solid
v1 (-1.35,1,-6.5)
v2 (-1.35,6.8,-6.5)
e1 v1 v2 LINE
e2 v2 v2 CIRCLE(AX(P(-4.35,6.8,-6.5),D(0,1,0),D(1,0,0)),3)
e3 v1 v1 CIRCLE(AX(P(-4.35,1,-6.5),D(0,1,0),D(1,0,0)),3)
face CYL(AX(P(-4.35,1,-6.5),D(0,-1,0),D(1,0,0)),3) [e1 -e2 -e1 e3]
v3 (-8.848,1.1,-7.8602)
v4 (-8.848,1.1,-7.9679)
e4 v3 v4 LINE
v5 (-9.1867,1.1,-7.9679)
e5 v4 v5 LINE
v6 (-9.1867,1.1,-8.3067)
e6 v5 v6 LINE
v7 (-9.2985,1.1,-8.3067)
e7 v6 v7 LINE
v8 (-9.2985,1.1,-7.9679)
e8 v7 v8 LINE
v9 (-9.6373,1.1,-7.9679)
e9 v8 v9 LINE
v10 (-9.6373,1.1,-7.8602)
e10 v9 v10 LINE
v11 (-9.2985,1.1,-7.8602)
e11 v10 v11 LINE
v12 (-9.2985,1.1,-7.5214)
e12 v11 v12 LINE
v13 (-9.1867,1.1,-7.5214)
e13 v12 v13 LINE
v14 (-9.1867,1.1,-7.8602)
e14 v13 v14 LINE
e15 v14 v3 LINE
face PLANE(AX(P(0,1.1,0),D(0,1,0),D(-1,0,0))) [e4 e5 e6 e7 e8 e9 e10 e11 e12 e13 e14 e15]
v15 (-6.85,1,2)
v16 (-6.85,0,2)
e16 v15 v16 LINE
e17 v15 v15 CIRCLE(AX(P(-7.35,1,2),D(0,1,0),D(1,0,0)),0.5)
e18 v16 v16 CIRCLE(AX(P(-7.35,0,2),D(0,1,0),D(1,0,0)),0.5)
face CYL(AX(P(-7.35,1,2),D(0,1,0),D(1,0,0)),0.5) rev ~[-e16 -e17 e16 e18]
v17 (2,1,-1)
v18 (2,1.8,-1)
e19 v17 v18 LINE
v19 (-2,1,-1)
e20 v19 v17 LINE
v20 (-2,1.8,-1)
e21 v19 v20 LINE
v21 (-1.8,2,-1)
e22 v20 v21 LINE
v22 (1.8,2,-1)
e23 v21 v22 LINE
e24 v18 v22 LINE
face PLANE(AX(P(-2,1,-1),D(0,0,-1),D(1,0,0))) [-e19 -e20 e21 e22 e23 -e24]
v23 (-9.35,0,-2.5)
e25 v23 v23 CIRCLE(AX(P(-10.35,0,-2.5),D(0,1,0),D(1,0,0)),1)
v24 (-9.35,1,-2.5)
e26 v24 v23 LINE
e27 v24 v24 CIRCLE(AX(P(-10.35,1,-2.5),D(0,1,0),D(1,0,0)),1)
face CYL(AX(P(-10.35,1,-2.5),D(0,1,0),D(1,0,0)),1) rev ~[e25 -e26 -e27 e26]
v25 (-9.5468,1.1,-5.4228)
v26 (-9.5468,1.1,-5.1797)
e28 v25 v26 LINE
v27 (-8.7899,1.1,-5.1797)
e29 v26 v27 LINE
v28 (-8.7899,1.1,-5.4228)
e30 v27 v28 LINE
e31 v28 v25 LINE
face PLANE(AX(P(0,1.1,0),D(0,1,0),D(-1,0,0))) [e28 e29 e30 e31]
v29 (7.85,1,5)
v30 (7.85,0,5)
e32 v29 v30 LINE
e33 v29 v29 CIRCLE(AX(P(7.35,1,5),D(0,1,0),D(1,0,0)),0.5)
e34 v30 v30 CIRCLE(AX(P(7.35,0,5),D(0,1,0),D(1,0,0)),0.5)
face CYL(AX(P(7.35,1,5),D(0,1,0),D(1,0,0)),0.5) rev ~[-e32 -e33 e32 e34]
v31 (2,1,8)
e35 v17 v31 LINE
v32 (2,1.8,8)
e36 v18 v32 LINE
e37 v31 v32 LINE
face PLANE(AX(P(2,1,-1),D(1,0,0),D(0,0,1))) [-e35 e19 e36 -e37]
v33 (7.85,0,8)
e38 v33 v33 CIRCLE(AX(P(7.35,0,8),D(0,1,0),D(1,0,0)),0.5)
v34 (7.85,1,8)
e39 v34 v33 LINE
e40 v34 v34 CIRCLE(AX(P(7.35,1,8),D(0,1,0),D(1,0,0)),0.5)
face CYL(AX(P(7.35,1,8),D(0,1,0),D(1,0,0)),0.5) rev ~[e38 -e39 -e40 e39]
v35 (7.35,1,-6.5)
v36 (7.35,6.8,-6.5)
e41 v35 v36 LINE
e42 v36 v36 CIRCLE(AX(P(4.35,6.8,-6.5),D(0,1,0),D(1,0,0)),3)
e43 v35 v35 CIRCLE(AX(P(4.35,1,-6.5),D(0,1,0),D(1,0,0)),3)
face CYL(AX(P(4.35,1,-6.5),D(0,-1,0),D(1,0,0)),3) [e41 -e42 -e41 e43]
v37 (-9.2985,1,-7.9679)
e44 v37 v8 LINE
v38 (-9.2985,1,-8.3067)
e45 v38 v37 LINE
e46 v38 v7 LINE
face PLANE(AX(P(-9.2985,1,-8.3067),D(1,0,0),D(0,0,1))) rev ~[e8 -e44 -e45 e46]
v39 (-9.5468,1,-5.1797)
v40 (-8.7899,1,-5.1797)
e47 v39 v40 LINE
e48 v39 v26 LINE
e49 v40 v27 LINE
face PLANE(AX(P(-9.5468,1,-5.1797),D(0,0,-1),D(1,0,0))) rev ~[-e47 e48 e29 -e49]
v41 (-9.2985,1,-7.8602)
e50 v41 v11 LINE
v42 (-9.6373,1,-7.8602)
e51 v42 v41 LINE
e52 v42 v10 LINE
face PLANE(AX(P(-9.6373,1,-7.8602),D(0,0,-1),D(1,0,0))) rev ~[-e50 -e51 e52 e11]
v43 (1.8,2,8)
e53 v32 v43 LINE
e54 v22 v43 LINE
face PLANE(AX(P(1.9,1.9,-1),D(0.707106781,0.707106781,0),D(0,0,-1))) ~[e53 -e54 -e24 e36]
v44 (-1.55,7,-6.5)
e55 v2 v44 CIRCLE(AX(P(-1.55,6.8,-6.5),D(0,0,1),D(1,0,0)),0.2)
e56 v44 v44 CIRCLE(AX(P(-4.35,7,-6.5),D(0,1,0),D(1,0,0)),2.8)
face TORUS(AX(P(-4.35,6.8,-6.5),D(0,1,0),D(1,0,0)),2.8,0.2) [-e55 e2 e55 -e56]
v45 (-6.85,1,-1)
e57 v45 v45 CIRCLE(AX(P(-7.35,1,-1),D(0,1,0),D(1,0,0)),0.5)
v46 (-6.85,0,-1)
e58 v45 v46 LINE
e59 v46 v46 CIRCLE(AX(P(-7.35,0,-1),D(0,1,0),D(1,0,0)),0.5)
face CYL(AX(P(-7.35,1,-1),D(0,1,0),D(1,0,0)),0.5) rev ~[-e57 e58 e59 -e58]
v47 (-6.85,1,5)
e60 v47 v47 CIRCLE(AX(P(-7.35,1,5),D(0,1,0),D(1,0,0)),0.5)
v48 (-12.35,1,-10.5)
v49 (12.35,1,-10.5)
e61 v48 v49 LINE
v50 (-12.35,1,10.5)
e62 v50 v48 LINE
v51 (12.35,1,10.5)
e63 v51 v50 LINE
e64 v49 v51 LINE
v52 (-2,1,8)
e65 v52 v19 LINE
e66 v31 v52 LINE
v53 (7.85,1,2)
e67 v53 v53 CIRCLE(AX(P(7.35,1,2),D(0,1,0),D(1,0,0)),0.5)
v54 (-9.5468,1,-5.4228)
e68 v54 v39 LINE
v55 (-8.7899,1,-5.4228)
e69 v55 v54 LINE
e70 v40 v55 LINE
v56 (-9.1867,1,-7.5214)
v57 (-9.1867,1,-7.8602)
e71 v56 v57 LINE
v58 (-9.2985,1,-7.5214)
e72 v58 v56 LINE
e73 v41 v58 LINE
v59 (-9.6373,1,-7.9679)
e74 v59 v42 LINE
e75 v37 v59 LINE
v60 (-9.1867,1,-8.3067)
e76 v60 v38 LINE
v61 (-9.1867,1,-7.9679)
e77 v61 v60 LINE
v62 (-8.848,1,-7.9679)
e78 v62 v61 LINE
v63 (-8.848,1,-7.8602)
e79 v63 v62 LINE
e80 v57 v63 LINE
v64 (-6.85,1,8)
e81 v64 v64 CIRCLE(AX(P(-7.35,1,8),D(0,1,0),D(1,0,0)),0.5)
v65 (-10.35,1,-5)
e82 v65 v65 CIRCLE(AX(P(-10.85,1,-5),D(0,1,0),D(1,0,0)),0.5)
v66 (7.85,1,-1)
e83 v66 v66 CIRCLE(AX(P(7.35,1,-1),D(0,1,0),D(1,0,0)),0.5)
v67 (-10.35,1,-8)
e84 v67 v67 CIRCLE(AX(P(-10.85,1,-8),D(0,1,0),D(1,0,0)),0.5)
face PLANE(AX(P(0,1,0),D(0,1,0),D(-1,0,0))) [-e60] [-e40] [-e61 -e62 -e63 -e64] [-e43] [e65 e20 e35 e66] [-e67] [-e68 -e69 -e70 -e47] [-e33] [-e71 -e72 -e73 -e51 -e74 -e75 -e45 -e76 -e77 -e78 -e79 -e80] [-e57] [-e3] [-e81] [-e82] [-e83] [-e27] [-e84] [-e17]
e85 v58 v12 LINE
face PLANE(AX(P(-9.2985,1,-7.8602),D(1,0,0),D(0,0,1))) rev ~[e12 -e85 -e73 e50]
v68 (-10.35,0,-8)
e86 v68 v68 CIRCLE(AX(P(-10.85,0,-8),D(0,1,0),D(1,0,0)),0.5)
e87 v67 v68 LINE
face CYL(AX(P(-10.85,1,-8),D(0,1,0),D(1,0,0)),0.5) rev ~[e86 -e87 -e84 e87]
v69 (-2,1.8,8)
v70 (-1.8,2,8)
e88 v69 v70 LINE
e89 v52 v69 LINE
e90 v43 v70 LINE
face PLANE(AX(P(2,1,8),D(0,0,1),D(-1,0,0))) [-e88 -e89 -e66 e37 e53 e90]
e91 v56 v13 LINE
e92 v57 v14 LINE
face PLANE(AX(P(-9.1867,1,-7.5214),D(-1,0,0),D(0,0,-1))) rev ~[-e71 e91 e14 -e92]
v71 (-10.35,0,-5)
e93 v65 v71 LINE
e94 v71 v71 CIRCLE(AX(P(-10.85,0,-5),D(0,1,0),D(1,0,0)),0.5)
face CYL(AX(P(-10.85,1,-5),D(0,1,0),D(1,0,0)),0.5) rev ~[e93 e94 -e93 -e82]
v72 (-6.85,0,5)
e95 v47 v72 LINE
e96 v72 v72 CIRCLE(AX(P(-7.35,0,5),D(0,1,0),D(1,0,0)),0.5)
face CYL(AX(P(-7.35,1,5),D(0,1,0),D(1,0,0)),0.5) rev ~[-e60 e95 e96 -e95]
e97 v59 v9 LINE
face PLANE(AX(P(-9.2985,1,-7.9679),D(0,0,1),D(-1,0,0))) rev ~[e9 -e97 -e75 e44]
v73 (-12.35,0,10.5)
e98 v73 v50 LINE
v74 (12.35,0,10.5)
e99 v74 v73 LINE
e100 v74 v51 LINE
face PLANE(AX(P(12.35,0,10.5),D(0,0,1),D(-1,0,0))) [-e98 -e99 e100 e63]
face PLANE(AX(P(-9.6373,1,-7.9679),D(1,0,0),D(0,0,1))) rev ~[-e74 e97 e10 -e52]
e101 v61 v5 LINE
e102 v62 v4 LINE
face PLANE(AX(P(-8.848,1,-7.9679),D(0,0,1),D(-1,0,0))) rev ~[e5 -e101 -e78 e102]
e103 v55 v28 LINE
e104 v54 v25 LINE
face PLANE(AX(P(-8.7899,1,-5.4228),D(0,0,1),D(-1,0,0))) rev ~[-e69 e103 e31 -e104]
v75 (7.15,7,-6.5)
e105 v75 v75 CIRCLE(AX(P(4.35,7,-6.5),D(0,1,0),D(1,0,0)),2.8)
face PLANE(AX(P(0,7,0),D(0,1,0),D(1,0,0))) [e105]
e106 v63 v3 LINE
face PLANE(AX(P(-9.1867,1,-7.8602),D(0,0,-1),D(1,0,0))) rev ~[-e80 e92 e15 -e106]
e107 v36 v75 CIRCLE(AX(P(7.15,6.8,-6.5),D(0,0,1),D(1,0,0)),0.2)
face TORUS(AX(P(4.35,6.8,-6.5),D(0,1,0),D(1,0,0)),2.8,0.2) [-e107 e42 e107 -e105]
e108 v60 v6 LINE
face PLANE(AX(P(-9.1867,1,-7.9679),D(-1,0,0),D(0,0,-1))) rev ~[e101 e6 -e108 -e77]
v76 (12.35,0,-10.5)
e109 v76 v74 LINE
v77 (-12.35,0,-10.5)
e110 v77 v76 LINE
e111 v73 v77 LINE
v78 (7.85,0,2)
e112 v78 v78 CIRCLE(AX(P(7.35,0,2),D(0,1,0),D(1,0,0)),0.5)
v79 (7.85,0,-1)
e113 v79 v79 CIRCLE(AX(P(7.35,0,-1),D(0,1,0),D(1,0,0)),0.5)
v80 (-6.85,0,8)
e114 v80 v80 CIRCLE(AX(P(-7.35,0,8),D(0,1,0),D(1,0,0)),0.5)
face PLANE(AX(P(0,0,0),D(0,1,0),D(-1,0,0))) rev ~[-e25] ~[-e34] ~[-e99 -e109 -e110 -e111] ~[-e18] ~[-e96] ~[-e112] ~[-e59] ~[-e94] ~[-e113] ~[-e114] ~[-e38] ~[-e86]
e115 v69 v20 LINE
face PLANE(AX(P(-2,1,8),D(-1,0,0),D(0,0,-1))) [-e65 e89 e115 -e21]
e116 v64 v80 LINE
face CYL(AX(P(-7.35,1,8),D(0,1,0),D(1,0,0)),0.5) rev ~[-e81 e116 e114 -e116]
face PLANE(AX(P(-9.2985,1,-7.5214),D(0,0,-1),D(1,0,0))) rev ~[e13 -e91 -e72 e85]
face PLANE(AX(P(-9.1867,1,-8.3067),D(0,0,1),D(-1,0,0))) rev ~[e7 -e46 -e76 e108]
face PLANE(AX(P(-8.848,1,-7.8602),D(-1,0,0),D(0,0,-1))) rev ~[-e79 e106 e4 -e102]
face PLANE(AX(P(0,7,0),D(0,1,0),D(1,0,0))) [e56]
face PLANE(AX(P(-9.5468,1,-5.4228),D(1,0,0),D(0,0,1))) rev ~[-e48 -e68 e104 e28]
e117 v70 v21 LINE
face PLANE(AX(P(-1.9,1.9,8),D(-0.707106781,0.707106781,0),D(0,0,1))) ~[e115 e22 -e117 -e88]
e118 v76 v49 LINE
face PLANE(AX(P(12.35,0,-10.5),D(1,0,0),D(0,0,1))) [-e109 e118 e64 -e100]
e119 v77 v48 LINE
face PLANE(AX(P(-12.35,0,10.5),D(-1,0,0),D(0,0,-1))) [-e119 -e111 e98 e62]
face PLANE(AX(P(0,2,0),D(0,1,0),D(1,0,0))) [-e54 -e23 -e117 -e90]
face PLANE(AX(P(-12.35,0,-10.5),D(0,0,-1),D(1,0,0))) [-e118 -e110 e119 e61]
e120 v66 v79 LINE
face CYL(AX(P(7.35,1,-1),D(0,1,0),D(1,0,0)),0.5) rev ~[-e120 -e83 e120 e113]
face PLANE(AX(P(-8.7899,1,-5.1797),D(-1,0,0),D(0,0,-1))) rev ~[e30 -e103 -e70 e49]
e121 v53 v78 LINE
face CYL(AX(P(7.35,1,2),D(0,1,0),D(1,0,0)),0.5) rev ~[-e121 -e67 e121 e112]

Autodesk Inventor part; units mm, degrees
ref_plane "YZ Plane" through (0, 0, 0) normal (1, 0, 0) x (0, 1, 0)
ref_plane "XZ Plane" through (0, 0, 0) normal (0, 1, 0) x (-1, 0, 0)
ref_plane "XY Plane" through (0, 0, 0) normal (0, 0, 1) x (1, 0, 0)
sketch "Sketch1" plane through (0, 0, 0) normal (0, 1, 0) x (-1, 0, 0)
  line L0 (-12.35, 10.5) -> (12.35, 10.5)
  line L1 (12.35, 10.5) -> (12.35, -10.5)
  line L2 (12.35, -10.5) -> (-12.35, -10.5)
  line L3 (-12.35, -10.5) -> (-12.35, 10.5)
  line L4 (-12.35, 10.5) -> (12.35, -10.5) construction
  line L5 (12.35, 10.5) -> (-12.35, -10.5) construction
  point P0 (0, 0)
  dimension "d0" = 21
  dimension "d1" = 24.7
extrude "Extrusion1" add sketch "Sketch1" along normal blind 1
sketch "Sketch2" plane through (0, 1, 0) normal (0, 1, 0) x (1, 0, 0)
  circle A0 centre (-10.35, 2.5) radius 1
  line L0 (12.35, 10.5) -> (-12.35, 10.5) projected
  line L1 (-12.35, 10.5) -> (-12.35, -10.5) projected
  point P0 (0, 0)
  dimension "d4" = 2
  dimension "d5" = 8
  dimension "d6" = 2
extrude "Extrusion2" cut sketch "Sketch2" against normal blind 1
sketch "Sketch3" plane through (0, 1, 0) normal (0, 1, 0) x (1, 0, 0)
  circle A0 centre (-4.35, 6.5) radius 3
  line L0 (-12.35, 10.5) -> (-12.35, -10.5) projected
  line L1 (12.35, 10.5) -> (-12.35, 10.5) projected
  line L2 (0, 0) -> (0, 10.5) construction
  circle A1 centre (4.35, 6.5) radius 3
  dimension "d9" = 6
  dimension "d10" = 8
  dimension "d11" = 4
extrude "Extrusion3" add sketch "Sketch3" along normal blind 6
fillet "Fillet1" radius 0.2 2 edges at (-7.35, 7, -6.5) (1.35, 7, -6.5)
sketch "Sketch4" plane through (0, 1, 0) normal (0, 1, 0) x (1, 0, 0)
  circle A0 centre (-7.35, 1) radius 0.5
  circle A1 centre (-7.35, -2) radius 0.5
  circle A2 centre (-10.35, 2.5) radius 1 projected
  line L0 (-10.35, 1.5) -> (-7.35, 1.5) construction
  circle A3 centre (-7.35, -5) radius 0.5
  circle A4 centre (-7.35, -8) radius 0.5
  circle A5 centre (-4.35, 6.5) radius 3 projected
  line L1 (-7.35, 6.5) -> (-7.35, 1.5) construction
  line L2 (0, 0) -> (0, -10.5851) construction
  circle A6 centre (7.35, 1) radius 0.5
  circle A7 centre (7.35, -2) radius 0.5
  circle A8 centre (7.35, -5) radius 0.5
  circle A9 centre (7.35, -8) radius 0.5
  dimension "d15" = 1
  dimension "d16" = 1
  dimension "d17" = 1
  dimension "d18" = 1
  dimension "d19" = 3
  dimension "d20" = 3
  dimension "d21" = 3
extrude "Extrusion4" cut sketch "Sketch4" against normal blind 1 contours A0 | A1 | A3 | A4 | A6 | A7 | A8 | A9
sketch "Sketch5" plane through (0, 1, 0) normal (0, 1, 0) x (1, 0, 0)
  line L0 (-2, 1) -> (2, 1)
  line L1 (2, 1) -> (2, -8)
  line L2 (2, -8) -> (-2, -8)
  line L3 (-2, -8) -> (-2, 1)
  circle A0 centre (-7.35, 1) radius 0.5 projected
  point P0 (0, 0)
  point P1 (0, 1)
  dimension "d26" = 4
  dimension "d27" = 9
extrude "Extrusion5" add sketch "Sketch5" along normal blind 1 contours L0 L1 L2 L3
chamfer "Chamfer1" distance 0.2 angle 45 2 edges at (2, 2, 3.5) (-2, 2, 3.5)
sketch "Sketch6" plane through (0, 1, 0) normal (0, 1, 0) x (1, 0, 0)
  circle A0 centre (-10.85, 8) radius 0.5
  circle A1 centre (-10.85, 5) radius 0.5
  line L0 (12.35, 10.5) -> (-12.35, 10.5) projected
  line L1 (-12.35, 10.5) -> (-12.35, -10.5) projected
  point P0 (0, 0)
  dimension "d33" = 1
  dimension "d34" = 1
  dimension "d35" = 2.5
  dimension "d36" = 1.5
  dimension "d37" = 3
extrude "Extrusion6" cut sketch "Sketch6" against normal blind 1
sketch "Sketch7" plane through (0, 1, 0) normal (0, 1, 0) x (1, 0, 0)
  line L0 (-9.7434, 8.3067) -> (-6.693, 8.3067) construction
  line L1 (-6.693, 8.3067) -> (-6.693, 5.9132) construction
  line L2 (-6.693, 5.9132) -> (-9.7434, 5.9132) construction
  line L3 (-9.7434, 5.9132) -> (-9.7434, 8.3067) construction
  line L4 (-9.6683, 5.4228) -> (-8.67, 5.4228) construction
  line L5 (-8.67, 5.4228) -> (-8.67, 5.1797) construction
  line L6 (-8.67, 5.1797) -> (-9.6683, 5.1797) construction
  line L7 (-9.6683, 5.1797) -> (-9.6683, 5.4228) construction
  line L8 (-8.848, 7.8602) -> (-9.1867, 7.8602)
  line L9 (-9.1867, 7.8602) -> (-9.1867, 7.5214)
  line L10 (-9.1867, 7.5214) -> (-9.2985, 7.5214)
  line L11 (-9.2985, 7.5214) -> (-9.2985, 7.8602)
  line L12 (-9.2985, 7.8602) -> (-9.6373, 7.8602)
  line L13 (-9.6373, 7.8602) -> (-9.6373, 7.9679)
  line L14 (-9.6373, 7.9679) -> (-9.2985, 7.9679)
  line L15 (-9.2985, 7.9679) -> (-9.2985, 8.3067)
  line L16 (-9.2985, 8.3067) -> (-9.1867, 8.3067)
  line L17 (-9.1867, 8.3067) -> (-9.1867, 7.9679)
  line L18 (-9.1867, 7.9679) -> (-8.848, 7.9679)
  line L19 (-8.848, 7.9679) -> (-8.848, 7.8602)
  line L20 (-8.7899, 5.1797) -> (-9.5468, 5.1797)
  line L21 (-9.5468, 5.1797) -> (-9.5468, 5.4228)
  line L22 (-9.5468, 5.4228) -> (-8.7899, 5.4228)
  line L23 (-8.7899, 5.4228) -> (-8.7899, 5.1797)
  point P0 (0, 0)
emboss "Emboss1" sketch "Sketch7" operation add depth 0.1 direction (0, -1, 0)
properties part number "L298N"
